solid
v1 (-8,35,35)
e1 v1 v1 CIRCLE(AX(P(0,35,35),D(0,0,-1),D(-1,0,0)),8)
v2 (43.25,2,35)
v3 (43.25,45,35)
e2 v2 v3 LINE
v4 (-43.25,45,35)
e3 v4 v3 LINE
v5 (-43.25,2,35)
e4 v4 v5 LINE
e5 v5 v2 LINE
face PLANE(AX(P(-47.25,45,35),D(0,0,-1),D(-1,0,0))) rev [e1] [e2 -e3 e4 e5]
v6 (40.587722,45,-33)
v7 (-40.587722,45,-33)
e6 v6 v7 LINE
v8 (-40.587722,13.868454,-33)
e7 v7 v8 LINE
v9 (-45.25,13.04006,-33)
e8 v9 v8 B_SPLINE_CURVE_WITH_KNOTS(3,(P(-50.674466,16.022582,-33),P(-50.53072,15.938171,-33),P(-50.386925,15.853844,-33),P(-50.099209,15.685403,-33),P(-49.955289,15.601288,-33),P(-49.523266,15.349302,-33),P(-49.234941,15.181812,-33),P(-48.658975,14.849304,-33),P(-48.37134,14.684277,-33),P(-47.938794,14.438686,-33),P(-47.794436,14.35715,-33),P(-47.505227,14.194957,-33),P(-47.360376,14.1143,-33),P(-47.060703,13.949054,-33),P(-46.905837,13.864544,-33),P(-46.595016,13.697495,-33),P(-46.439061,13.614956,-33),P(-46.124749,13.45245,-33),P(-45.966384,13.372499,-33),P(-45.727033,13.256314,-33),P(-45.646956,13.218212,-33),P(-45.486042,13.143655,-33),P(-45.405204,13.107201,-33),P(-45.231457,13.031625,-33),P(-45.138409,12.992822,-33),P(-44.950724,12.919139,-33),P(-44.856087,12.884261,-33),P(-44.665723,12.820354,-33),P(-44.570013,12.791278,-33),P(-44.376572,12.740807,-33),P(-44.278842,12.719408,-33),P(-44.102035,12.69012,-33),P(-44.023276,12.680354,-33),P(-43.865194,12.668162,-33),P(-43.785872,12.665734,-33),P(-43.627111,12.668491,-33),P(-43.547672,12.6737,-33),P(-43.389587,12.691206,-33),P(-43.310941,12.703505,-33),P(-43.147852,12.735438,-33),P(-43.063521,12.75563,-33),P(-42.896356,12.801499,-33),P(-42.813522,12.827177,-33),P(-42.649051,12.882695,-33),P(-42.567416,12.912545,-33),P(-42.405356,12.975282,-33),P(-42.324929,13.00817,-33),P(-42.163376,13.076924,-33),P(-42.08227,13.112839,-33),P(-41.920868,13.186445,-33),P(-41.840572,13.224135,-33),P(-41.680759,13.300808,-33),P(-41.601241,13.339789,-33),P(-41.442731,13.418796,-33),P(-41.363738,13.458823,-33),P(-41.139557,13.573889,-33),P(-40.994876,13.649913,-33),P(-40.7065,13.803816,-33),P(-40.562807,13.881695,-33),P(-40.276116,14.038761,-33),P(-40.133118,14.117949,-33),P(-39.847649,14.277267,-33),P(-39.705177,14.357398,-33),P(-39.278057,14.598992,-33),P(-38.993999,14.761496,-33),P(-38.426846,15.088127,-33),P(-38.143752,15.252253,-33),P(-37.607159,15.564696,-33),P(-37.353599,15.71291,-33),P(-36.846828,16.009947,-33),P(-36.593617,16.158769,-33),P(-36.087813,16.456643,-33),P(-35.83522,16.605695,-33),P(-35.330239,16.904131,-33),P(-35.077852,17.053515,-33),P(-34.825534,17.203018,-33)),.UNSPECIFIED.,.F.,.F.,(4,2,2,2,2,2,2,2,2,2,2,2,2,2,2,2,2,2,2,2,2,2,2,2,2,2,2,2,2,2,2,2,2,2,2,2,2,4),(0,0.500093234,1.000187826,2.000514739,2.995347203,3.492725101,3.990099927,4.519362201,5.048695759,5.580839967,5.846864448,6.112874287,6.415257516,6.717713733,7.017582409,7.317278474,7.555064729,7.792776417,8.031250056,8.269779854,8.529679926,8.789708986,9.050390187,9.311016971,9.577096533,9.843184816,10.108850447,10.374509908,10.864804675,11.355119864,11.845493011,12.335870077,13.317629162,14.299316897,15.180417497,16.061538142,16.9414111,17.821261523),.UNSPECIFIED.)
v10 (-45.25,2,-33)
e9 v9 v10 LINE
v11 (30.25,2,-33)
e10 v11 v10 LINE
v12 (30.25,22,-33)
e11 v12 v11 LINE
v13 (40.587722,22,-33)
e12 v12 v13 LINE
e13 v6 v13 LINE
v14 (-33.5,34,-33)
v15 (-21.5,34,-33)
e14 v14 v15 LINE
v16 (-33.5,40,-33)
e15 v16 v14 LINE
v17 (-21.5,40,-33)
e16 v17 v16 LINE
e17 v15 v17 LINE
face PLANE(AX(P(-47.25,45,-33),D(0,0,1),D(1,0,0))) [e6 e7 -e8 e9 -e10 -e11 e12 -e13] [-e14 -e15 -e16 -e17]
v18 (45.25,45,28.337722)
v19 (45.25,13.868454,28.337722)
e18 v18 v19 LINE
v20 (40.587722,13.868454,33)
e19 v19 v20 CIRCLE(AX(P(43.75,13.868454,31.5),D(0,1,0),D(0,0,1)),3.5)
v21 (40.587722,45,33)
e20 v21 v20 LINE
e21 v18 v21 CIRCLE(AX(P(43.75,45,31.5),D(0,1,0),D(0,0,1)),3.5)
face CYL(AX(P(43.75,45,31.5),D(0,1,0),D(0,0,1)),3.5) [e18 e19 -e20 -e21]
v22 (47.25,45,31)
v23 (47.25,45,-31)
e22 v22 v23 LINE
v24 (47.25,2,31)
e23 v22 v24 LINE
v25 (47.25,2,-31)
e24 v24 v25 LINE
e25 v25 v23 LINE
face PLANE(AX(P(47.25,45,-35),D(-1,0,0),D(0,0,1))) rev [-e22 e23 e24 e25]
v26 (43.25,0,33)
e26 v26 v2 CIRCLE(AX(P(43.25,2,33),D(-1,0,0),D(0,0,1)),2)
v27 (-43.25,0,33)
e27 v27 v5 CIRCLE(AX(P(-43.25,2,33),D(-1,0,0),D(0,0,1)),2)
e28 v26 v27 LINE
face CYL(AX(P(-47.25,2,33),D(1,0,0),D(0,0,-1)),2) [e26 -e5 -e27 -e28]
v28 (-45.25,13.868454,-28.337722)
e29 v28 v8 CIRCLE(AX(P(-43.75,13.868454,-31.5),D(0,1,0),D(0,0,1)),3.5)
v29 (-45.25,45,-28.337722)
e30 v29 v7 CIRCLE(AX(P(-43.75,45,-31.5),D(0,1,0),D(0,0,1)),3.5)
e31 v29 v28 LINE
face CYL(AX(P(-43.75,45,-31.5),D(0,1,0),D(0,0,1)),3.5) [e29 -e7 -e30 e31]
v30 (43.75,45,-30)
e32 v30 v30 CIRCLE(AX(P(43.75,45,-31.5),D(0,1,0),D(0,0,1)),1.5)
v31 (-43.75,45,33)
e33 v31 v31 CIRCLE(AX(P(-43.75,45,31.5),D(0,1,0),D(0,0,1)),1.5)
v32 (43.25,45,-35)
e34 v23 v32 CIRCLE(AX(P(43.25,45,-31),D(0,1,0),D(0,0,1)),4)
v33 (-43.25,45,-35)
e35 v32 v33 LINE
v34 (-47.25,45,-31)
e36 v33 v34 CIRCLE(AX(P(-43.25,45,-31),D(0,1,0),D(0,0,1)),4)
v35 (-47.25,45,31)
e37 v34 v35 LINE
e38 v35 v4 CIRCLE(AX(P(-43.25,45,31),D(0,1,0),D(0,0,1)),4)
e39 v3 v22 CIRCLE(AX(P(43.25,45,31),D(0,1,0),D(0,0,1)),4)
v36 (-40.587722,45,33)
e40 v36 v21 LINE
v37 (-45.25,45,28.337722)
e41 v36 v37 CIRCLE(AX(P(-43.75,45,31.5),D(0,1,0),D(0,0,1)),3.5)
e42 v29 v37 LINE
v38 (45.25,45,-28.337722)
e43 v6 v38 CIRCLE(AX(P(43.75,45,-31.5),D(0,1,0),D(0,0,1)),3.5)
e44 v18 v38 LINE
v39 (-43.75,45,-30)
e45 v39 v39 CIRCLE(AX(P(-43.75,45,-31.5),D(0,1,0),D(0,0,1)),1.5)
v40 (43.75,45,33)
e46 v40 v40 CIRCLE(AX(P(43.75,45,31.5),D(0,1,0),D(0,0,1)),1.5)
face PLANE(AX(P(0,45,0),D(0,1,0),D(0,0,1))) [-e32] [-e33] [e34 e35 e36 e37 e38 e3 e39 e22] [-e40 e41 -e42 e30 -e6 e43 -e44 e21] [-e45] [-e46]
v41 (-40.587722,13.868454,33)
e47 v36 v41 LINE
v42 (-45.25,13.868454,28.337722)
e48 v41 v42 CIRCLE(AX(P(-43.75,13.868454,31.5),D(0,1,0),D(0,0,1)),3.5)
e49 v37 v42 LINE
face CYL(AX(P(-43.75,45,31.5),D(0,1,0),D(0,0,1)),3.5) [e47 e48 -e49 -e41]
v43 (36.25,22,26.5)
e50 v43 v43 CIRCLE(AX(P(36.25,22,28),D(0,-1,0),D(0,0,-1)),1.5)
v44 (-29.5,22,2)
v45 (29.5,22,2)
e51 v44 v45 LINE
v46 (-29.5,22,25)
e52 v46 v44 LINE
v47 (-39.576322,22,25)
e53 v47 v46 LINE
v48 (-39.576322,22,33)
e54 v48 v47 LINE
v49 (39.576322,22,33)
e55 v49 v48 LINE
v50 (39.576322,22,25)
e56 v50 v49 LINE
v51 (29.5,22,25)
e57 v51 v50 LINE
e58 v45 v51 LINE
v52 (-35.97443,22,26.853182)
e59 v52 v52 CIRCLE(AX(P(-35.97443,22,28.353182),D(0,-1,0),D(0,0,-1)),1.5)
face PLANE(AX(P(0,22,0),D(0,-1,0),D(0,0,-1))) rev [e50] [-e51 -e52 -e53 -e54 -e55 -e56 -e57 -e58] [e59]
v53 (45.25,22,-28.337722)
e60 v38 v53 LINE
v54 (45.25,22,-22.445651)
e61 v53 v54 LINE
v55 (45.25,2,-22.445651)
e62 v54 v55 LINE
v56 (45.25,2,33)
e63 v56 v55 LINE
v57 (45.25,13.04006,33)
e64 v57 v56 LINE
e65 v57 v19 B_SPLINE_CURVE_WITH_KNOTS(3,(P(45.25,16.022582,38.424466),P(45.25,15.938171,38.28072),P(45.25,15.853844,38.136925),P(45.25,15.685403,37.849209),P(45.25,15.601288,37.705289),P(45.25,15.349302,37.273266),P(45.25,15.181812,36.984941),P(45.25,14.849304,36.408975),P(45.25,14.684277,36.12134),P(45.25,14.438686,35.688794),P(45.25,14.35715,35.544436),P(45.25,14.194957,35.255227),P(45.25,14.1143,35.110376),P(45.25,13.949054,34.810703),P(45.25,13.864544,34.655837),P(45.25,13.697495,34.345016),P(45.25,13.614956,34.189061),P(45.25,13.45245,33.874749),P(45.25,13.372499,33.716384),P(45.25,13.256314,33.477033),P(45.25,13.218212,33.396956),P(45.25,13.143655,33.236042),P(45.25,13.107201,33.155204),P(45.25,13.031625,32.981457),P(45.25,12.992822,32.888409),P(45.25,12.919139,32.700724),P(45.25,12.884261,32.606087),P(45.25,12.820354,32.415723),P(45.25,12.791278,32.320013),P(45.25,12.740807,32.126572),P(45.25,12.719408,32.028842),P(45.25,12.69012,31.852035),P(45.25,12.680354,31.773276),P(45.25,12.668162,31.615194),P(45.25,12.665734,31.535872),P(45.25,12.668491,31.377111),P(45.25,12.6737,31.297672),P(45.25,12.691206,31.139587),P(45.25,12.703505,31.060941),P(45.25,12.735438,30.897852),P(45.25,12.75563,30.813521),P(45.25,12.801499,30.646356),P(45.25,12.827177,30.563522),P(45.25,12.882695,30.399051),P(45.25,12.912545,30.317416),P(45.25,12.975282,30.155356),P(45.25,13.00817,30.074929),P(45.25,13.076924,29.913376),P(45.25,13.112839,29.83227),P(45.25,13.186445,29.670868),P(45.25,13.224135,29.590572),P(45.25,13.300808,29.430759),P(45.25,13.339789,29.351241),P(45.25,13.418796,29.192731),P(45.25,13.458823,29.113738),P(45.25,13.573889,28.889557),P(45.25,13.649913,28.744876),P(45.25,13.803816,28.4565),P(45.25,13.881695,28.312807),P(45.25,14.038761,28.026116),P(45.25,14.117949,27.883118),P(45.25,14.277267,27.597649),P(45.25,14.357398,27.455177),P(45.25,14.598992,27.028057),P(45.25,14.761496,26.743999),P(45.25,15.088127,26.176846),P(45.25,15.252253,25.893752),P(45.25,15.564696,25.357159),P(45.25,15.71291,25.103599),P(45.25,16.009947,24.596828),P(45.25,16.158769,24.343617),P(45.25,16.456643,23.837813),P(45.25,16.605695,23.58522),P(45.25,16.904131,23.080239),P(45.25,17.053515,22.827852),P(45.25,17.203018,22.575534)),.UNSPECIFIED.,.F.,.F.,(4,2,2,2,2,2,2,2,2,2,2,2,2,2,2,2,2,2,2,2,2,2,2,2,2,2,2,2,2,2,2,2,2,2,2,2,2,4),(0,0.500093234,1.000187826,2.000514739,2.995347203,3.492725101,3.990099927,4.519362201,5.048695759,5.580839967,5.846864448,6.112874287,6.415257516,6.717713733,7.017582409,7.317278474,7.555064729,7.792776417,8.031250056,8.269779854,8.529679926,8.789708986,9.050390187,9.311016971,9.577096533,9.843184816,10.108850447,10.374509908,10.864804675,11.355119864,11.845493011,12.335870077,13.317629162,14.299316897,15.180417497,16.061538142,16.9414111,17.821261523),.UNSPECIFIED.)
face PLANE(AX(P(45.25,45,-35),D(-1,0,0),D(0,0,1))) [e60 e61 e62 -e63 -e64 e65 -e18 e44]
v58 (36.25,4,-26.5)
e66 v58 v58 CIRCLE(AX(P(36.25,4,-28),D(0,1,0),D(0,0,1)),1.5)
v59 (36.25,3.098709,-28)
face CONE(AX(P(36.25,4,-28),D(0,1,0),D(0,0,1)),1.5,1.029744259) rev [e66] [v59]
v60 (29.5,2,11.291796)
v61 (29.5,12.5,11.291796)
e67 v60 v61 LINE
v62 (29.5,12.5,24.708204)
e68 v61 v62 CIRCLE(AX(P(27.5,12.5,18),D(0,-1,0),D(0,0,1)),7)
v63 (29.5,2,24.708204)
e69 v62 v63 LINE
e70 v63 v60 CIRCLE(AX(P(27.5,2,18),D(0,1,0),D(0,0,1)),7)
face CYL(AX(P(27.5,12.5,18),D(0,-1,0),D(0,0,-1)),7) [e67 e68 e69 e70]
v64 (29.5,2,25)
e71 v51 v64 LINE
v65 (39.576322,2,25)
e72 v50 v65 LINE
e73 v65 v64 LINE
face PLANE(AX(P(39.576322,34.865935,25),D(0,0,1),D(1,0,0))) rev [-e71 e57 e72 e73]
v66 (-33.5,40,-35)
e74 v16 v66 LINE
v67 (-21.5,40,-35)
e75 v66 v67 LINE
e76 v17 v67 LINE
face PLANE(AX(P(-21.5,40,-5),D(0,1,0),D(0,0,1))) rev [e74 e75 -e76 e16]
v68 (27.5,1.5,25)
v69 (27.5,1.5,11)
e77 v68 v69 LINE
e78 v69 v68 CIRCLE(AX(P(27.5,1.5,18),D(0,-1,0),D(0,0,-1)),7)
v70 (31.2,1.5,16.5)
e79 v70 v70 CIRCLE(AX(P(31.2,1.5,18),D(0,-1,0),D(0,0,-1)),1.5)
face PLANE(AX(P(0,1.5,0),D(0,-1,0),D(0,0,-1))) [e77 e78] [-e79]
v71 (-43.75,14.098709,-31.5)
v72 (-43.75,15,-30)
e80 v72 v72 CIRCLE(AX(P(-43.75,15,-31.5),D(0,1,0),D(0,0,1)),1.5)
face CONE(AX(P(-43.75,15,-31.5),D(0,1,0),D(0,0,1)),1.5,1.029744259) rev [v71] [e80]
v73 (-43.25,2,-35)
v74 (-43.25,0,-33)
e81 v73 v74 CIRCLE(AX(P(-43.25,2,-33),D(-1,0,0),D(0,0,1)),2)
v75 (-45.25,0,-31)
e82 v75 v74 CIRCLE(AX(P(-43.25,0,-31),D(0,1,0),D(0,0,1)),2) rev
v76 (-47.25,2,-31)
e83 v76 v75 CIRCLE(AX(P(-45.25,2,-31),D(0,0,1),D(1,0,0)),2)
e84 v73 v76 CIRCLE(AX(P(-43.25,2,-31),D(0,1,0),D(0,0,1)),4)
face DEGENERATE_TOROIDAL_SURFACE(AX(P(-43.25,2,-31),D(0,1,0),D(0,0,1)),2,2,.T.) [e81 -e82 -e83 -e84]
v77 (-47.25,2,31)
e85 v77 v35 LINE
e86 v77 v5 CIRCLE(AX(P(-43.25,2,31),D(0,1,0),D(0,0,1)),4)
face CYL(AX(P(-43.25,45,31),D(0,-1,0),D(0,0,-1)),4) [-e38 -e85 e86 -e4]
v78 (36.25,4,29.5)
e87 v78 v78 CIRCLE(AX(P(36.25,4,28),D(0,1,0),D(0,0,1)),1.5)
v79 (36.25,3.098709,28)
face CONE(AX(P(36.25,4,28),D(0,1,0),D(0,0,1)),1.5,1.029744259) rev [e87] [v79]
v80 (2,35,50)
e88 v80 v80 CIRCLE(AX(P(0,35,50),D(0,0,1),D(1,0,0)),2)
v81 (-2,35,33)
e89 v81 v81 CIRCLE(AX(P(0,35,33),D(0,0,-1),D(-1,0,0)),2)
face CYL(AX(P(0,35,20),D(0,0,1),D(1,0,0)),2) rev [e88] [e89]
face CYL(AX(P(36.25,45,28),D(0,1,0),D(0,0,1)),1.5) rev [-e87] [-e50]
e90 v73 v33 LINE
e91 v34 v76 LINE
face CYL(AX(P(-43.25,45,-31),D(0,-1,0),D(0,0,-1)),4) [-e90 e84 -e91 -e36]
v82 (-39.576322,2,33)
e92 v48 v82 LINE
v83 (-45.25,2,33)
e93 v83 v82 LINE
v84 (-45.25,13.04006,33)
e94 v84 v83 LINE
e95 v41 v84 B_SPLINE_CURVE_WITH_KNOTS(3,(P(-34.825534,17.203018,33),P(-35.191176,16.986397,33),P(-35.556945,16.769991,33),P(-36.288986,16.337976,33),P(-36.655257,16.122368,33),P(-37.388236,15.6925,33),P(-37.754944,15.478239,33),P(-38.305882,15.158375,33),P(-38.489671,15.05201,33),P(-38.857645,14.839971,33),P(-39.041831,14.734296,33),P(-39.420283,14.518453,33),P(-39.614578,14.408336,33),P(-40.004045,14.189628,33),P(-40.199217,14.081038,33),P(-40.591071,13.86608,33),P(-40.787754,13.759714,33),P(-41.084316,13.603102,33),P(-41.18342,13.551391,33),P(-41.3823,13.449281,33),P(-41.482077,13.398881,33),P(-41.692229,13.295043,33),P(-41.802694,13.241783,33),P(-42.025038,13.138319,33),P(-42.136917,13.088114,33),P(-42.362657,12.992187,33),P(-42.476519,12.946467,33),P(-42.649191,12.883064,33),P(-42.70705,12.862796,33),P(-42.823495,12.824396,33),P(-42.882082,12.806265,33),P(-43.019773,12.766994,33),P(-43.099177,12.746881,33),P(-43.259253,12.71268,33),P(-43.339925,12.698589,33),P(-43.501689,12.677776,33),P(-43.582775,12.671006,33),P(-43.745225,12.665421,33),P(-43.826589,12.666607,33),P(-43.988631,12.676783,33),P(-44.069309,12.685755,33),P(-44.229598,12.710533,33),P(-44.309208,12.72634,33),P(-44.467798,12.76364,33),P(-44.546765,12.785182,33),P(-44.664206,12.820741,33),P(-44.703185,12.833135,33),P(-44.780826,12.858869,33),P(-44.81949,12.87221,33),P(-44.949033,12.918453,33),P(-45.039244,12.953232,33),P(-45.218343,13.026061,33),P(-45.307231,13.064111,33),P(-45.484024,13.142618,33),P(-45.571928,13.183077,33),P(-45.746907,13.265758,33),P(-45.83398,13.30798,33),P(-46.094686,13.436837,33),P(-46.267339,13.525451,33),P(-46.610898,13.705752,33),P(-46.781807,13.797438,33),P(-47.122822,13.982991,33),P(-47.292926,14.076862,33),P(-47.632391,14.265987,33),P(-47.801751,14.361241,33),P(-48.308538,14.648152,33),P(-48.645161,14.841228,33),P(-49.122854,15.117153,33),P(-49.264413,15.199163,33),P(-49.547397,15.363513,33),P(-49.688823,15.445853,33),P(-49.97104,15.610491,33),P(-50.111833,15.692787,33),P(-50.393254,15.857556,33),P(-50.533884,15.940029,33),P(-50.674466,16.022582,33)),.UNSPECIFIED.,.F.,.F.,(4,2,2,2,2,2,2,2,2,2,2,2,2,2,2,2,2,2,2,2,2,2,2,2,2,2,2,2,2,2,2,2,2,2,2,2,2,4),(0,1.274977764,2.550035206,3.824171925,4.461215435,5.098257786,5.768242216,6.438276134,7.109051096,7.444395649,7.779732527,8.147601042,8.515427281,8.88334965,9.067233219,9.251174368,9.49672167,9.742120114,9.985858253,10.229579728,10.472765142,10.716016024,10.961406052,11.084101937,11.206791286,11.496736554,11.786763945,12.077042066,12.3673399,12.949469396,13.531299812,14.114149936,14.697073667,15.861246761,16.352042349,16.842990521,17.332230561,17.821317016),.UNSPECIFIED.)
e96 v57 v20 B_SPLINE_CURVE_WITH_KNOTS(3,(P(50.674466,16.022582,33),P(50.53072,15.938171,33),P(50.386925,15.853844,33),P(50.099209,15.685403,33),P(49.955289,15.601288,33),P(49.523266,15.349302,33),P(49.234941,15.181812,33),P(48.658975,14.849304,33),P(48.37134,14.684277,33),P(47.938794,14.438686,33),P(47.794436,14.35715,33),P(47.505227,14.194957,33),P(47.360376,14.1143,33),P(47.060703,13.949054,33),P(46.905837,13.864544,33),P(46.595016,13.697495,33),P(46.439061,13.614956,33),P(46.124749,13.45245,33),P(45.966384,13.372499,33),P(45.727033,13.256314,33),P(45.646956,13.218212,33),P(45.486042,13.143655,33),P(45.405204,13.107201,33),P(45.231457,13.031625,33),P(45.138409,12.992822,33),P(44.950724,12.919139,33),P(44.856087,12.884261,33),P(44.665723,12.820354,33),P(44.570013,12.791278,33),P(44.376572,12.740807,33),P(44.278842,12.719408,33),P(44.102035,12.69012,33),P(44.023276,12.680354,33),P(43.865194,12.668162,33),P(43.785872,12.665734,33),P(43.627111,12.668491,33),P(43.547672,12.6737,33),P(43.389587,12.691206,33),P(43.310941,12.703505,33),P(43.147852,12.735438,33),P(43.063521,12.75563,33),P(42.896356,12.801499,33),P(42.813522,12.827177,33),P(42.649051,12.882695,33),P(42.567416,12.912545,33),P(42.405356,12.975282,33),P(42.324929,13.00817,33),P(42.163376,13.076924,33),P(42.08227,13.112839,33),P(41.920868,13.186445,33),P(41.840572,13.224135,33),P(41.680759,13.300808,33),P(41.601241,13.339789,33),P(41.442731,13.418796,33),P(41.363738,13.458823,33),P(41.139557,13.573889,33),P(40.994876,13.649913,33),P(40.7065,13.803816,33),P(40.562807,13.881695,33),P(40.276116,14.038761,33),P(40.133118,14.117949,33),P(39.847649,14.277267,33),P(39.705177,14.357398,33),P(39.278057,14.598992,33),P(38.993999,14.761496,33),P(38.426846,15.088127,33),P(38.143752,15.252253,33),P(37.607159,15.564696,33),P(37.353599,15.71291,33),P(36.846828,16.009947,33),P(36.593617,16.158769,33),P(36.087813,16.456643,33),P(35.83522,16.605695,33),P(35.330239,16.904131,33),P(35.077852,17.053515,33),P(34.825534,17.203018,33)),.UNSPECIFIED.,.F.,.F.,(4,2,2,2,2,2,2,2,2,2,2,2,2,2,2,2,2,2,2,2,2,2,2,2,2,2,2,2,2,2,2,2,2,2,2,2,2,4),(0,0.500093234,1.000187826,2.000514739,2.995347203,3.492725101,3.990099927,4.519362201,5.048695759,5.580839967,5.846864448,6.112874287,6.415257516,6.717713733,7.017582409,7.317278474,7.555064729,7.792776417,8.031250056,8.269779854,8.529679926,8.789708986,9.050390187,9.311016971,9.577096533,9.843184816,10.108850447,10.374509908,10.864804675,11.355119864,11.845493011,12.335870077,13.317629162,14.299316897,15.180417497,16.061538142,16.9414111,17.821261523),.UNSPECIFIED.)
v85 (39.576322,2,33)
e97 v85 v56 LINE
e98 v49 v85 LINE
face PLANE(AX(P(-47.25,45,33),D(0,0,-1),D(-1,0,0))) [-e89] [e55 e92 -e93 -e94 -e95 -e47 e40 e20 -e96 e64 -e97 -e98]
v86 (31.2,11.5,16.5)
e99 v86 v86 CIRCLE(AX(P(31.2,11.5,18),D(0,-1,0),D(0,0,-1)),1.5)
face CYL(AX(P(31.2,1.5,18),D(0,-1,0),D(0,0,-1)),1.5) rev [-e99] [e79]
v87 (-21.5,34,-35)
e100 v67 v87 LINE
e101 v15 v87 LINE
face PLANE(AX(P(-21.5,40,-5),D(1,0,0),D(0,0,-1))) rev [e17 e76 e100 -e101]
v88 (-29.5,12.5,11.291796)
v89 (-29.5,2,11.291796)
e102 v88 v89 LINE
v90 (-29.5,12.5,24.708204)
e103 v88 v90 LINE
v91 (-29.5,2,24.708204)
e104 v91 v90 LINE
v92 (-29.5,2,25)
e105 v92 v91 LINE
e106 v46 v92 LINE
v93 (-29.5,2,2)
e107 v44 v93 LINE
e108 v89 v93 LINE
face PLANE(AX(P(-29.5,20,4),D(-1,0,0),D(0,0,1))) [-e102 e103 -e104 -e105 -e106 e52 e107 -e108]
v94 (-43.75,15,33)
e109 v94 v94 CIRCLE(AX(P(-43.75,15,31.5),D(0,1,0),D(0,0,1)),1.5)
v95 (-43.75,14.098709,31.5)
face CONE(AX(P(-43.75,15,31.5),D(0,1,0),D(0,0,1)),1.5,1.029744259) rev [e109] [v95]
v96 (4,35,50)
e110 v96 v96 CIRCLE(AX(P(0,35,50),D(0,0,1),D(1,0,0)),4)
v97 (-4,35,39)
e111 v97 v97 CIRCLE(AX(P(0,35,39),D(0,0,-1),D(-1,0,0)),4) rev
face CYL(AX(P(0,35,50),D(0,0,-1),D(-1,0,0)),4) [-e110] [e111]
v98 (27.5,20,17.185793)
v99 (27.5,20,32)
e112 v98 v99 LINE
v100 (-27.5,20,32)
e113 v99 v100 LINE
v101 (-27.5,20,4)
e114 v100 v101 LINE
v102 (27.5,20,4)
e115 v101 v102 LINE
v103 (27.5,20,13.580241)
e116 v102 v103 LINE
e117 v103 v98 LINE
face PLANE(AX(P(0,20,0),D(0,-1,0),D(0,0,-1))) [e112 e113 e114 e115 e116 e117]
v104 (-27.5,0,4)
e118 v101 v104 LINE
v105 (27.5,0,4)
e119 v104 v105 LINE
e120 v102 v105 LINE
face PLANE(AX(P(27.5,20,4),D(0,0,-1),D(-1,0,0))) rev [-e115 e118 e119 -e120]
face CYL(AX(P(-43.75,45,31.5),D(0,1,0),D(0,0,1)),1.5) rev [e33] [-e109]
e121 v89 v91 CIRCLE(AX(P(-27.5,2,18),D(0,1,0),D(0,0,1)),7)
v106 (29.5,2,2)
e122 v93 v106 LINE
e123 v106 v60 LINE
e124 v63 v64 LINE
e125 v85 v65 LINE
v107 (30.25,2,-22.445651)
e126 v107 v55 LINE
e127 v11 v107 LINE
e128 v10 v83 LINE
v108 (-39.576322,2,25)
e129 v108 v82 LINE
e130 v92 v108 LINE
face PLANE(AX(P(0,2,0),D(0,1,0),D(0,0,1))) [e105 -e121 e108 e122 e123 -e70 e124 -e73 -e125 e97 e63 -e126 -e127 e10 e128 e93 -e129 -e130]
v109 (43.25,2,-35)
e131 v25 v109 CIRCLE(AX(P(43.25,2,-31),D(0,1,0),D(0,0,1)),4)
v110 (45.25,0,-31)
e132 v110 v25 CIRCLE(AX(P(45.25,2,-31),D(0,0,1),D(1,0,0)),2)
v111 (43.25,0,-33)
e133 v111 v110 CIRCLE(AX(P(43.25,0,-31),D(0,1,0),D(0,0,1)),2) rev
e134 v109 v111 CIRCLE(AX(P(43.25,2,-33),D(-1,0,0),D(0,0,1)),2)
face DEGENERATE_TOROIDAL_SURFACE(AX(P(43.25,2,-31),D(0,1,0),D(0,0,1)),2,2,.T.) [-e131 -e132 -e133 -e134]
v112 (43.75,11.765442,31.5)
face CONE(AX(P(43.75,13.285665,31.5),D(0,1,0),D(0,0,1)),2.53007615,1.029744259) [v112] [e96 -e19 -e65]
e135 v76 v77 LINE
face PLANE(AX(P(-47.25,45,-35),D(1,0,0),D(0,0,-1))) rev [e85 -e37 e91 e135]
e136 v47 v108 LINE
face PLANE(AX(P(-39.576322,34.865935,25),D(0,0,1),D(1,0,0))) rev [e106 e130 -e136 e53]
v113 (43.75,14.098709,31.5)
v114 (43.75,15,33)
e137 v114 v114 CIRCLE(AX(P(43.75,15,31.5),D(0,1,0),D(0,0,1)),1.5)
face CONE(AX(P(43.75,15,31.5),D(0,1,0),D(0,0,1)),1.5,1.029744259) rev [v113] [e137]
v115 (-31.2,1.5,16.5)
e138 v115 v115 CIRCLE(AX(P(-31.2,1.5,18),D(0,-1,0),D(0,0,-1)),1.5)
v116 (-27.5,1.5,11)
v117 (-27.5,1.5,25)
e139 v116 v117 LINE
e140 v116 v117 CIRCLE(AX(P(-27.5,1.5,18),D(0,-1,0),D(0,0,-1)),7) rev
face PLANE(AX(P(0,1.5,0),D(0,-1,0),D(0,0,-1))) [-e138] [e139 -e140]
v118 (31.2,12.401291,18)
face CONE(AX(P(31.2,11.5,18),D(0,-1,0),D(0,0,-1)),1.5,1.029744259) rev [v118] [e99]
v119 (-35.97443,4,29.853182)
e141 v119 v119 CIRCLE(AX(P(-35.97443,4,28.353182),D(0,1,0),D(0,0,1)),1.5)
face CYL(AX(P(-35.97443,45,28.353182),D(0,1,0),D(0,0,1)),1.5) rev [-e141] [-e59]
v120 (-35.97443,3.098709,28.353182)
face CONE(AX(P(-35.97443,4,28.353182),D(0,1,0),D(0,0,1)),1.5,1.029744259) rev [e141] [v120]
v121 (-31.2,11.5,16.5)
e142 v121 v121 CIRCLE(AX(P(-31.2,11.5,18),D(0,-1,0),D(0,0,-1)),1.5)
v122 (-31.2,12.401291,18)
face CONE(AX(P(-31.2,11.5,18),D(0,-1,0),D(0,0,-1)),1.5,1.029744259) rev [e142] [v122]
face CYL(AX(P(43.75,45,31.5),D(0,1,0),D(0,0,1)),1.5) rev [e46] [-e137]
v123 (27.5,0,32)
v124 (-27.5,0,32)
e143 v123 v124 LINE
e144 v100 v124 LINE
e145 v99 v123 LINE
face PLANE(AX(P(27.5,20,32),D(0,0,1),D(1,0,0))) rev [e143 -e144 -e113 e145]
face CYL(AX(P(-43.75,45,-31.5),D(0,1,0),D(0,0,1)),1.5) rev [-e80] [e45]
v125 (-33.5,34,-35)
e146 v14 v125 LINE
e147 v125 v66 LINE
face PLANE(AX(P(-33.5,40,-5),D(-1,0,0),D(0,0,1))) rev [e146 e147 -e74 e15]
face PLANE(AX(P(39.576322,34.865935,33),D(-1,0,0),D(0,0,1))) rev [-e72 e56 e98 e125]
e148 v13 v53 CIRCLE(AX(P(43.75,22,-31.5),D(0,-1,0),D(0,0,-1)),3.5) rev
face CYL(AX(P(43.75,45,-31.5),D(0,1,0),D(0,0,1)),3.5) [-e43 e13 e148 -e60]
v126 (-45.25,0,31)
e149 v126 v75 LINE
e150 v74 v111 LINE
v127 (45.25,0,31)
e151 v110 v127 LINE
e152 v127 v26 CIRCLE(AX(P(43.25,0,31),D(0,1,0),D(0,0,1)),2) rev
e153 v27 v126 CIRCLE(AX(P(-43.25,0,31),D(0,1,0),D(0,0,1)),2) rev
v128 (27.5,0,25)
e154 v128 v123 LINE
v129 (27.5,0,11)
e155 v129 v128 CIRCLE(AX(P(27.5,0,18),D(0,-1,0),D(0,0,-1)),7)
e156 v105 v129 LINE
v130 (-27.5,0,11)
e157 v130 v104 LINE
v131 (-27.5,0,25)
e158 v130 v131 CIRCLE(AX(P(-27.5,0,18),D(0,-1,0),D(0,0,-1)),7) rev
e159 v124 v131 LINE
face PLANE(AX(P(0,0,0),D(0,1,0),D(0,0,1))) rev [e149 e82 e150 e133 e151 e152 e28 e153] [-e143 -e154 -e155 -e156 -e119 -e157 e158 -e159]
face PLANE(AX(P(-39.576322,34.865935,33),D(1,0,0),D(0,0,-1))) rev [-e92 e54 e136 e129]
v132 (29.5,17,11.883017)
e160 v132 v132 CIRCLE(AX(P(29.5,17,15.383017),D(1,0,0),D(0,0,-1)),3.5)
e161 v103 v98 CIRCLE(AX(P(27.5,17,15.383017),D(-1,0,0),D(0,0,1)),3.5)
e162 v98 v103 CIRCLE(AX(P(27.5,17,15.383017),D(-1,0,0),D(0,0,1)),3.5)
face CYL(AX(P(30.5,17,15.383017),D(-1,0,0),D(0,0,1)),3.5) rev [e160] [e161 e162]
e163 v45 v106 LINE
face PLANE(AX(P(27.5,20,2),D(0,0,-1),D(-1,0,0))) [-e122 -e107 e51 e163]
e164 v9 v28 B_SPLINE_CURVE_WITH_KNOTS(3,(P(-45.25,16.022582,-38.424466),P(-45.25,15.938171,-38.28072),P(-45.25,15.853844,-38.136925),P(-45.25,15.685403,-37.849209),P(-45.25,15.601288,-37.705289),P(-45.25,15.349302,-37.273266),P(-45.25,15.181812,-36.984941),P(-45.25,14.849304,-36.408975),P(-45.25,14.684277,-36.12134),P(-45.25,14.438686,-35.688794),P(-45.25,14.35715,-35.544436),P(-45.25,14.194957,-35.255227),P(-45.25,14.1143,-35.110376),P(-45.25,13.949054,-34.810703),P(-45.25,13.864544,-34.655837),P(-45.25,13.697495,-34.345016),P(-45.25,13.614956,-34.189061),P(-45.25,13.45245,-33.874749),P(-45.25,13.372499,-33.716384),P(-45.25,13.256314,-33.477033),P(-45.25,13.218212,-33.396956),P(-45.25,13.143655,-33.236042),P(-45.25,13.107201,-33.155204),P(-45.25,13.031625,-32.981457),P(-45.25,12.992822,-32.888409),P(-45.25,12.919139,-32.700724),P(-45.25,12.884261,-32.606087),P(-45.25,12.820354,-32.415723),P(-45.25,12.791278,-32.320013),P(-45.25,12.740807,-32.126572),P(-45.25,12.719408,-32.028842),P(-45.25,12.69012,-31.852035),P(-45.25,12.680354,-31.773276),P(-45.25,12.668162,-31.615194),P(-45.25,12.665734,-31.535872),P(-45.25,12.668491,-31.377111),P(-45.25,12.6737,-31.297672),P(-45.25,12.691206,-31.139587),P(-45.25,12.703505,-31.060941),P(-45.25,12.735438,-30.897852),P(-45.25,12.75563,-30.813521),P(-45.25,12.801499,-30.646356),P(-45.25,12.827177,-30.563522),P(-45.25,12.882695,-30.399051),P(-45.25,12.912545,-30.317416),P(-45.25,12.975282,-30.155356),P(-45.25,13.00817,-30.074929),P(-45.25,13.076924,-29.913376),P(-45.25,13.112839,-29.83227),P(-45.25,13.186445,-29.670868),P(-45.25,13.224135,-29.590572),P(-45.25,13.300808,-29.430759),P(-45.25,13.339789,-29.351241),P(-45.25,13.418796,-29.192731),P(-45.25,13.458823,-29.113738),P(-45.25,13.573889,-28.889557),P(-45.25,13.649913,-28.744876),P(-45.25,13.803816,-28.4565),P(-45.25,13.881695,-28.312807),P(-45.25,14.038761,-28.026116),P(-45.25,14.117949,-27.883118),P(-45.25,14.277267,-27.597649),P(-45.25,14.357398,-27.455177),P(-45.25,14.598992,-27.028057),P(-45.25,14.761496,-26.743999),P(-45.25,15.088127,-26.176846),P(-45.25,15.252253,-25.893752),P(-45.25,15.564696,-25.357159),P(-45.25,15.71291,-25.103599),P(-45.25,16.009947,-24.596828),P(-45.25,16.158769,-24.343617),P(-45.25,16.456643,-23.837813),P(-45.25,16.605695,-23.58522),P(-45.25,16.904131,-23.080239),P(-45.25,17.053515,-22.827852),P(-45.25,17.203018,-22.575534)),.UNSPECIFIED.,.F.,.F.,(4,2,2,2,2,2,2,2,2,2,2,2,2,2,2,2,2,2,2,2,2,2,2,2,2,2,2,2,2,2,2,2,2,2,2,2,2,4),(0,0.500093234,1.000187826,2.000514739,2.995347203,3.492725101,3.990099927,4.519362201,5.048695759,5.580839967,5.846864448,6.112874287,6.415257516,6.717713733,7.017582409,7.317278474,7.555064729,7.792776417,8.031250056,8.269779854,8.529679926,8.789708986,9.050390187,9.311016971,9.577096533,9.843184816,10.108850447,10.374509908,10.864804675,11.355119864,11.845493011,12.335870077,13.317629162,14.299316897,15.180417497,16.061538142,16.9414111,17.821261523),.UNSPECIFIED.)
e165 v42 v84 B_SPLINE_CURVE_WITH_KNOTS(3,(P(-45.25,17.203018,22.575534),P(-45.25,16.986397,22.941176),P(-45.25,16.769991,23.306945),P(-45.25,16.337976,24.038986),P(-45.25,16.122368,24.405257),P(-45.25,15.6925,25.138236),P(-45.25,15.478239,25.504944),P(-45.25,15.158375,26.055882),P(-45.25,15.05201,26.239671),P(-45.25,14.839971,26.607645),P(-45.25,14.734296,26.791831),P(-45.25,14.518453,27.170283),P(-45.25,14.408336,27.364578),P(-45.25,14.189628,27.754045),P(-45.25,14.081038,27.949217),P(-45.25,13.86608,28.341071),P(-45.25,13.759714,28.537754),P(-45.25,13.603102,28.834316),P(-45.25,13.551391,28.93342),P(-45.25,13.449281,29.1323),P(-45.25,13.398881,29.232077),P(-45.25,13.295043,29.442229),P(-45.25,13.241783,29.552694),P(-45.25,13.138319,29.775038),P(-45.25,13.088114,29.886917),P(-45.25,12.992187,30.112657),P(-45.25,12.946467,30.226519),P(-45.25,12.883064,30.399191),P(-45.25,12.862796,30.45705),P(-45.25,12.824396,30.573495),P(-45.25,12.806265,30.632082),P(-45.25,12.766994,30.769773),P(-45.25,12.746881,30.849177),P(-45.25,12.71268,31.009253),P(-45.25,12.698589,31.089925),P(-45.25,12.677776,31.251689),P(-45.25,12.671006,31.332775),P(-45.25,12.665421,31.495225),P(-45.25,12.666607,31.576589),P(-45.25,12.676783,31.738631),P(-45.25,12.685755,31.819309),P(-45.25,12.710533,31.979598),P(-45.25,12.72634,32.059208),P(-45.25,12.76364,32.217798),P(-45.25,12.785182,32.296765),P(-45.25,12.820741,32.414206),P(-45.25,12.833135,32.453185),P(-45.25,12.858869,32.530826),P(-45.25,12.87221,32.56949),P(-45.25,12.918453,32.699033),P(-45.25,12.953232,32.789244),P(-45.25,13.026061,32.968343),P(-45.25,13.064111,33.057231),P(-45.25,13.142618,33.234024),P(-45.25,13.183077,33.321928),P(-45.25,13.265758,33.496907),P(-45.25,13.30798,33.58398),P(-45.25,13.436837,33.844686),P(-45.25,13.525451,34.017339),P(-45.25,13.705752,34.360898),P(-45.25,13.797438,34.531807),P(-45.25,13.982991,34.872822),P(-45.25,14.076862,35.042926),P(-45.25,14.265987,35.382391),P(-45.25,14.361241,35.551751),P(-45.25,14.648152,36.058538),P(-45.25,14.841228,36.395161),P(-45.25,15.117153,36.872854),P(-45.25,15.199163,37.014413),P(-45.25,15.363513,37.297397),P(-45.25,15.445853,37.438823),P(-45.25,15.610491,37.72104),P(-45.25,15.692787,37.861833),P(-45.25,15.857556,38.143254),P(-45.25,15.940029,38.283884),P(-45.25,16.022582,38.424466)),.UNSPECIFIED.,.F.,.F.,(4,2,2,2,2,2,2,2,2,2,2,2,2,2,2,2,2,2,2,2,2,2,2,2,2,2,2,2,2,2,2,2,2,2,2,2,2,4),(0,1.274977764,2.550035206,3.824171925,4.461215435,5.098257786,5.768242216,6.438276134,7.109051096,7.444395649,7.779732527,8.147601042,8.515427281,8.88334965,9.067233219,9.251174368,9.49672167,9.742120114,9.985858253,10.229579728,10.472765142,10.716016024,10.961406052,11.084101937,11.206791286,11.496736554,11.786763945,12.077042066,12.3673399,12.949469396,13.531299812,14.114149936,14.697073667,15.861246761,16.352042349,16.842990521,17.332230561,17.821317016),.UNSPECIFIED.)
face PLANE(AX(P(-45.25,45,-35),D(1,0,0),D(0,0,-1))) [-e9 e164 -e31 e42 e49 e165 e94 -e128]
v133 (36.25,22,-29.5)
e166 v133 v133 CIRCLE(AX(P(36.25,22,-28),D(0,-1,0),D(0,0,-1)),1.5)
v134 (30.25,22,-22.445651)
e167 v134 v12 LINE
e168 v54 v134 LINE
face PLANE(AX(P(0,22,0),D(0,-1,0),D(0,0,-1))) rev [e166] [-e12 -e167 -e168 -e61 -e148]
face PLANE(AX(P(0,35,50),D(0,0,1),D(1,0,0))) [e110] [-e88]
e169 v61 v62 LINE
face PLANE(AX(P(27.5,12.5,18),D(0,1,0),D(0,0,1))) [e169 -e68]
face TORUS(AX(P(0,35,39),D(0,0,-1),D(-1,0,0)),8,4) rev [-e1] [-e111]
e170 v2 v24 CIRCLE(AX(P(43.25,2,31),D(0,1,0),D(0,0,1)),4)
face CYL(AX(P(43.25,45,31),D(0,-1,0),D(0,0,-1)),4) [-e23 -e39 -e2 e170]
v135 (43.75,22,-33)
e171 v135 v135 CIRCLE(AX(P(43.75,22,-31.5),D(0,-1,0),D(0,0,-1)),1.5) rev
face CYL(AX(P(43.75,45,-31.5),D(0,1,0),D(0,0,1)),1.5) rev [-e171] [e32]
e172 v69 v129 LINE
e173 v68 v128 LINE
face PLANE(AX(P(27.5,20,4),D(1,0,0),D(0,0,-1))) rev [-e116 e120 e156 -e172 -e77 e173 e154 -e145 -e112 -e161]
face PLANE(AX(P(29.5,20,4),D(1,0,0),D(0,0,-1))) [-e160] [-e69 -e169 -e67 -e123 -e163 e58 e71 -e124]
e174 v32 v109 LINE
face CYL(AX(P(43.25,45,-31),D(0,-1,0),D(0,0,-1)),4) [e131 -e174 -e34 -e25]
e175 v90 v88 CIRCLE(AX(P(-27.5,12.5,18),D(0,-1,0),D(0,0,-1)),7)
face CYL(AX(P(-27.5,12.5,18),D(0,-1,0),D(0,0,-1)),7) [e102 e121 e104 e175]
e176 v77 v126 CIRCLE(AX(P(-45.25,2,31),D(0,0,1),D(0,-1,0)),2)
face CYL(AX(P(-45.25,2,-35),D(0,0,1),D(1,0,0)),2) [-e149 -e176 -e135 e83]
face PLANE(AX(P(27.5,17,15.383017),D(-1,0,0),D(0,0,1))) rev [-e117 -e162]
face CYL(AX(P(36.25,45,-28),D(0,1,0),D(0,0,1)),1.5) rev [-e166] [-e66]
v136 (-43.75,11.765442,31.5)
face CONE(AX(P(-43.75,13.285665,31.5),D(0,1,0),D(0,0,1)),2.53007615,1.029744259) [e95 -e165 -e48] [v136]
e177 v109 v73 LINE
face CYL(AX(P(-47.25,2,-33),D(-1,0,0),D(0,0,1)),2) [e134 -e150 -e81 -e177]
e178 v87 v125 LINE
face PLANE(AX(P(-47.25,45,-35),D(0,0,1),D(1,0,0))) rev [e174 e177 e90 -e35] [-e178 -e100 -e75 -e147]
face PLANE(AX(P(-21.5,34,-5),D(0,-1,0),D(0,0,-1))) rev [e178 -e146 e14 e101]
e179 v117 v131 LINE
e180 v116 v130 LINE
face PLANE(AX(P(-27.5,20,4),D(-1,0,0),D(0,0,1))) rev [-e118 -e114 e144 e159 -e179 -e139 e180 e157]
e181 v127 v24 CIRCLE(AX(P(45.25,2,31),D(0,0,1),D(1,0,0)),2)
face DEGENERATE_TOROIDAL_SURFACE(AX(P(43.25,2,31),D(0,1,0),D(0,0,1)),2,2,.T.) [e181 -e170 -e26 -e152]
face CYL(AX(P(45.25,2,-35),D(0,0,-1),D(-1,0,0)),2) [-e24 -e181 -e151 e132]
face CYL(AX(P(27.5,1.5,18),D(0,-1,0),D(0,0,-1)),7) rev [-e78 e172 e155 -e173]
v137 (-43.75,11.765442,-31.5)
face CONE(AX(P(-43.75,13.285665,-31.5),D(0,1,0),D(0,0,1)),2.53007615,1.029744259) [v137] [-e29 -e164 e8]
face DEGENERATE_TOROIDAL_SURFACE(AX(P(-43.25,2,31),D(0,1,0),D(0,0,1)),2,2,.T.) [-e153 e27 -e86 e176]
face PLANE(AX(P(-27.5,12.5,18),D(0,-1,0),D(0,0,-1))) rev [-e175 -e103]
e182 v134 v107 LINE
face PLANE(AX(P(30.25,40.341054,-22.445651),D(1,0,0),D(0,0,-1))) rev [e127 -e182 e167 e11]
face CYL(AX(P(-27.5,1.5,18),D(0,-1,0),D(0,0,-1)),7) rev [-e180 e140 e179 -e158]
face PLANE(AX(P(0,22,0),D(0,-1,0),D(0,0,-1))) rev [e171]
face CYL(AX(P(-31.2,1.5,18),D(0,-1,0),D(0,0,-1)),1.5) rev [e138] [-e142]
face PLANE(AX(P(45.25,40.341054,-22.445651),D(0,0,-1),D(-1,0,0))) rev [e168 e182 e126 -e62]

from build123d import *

# Parameters (mm, degrees)
SKETCH1_W                 = 94.5
SKETCH1_H                 = 70
BOSS_EXTRUDE1_DEPTH       = 45
F_3_0MM_DOWEL_HOLE1_D     = 3
F_3_0MM_DOWEL_HOLE1_DEPTH = 30
F_3_0MM_DOWEL_HOLE1_TIP   = 0.901290929
SKETCH7_W                 = 55
SKETCH7_H                 = 28
CUT_EXTRUDE2_DEPTH        = 20
SHELL2_START              = 2
SHELL2_DEPTH              = 43
SHELL2_START_2            = 22
SHELL2_2_OUTLINE_W        = 59
SHELL2_2_OUTLINE_H        = 31
SHELL2_2_DEPTH            = 23
SHELL2_3_DEPTH            = 11.868454444
CUT_EXTRUDE3_DEPTH        = 1.5
BOSS_EXTRUDE9_DEPTH       = 11
F_3_0MM_DOWEL_HOLE3_D     = 3
F_3_0MM_DOWEL_HOLE3_DEPTH = 10
F_3_0MM_DOWEL_HOLE3_TIP   = 0.901290929
SKETCH15_R                = 3.5
CUT_EXTRUDE4_DEPTH        = 3
SKETCH30_W                = 10.076322372
SKETCH30_H                = 8
BOSS_EXTRUDE5_DEPTH       = 20
SKETCH31_W                = 15
SKETCH31_H                = 10.554348819
BOSS_EXTRUDE6_DEPTH       = 20
F_3_0MM_DOWEL_HOLE4_D     = 3
F_3_0MM_DOWEL_HOLE4_DEPTH = 41
F_3_0MM_DOWEL_HOLE4_TIP   = 0.901290929
SKETCH27_W                = 12
SKETCH27_H                = 6
CUT_EXTRUDE5_DEPTH        = 30
SKETCH33_R                = 4
BOSS_EXTRUDE7_DEPTH       = 15
SKETCH34_R                = 2
CUT_EXTRUDE6_DEPTH        = 30
FILLET1_R                 = 4
FILLET2_R                 = 4
FILLET3_R                 = 2


with BuildPart() as part:
    # Sketch1 → Boss-Extrude1 (new body)
    with BuildSketch(Plane(origin=(0, 0, 0), x_dir=(1, 0, 0), z_dir=(0, 1, 0))):
        Rectangle(SKETCH1_W, SKETCH1_H)
    extrude(amount=BOSS_EXTRUDE1_DEPTH)

    # Ø3.0mm Dowel Hole1
    with Locations(Plane(origin=(-43.75, 45, -31.5), x_dir=(0, 0, 1), z_dir=(0, 1, 0))):
        with Locations((0, 0), (0, 87.5), (63, 87.5), (63, 0)):
            Hole(F_3_0MM_DOWEL_HOLE1_D / 2, depth=F_3_0MM_DOWEL_HOLE1_DEPTH)
            with Locations((0, 0, -(F_3_0MM_DOWEL_HOLE1_DEPTH + F_3_0MM_DOWEL_HOLE1_TIP / 2))):  # 118° drill point
                Cone(0, F_3_0MM_DOWEL_HOLE1_D / 2, F_3_0MM_DOWEL_HOLE1_TIP, mode=Mode.SUBTRACT)

    # Sketch7 → Cut-Extrude2 (cut)
    with BuildSketch(Plane.XZ):
        with Locations((0, 18)):
            Rectangle(SKETCH7_W, SKETCH7_H)
    extrude(amount=-CUT_EXTRUDE2_DEPTH, mode=Mode.SUBTRACT)

    # Shell2: read off the stored shape, not the designer's step
    # Shell2 outline → Shell2 (cut)
    with BuildSketch(Plane(origin=(0, 0, 0), x_dir=(1, 0, 0), z_dir=(0, 1, 0)).offset(SHELL2_START)):
        with BuildLine():
            Line((-45.25, 28.33772234), (-45.25, -28.33772234))
            ThreePointArc((-45.25, -28.33772234), (-41.275126266, -29.025126266), (-40.58772234, -33))
            Line((-40.58772234, -33), (-29.5, -33))
            Line((-29.5, -33), (-29.5, -2))
            Line((-29.5, -2), (29.5, -2))
            Line((29.5, -2), (29.5, -33))
            Line((29.5, -33), (40.58772234, -33))
            ThreePointArc((40.58772234, -33), (41.275126266, -29.025126266), (45.25, -28.33772234))
            Line((45.25, -28.33772234), (45.25, 28.33772234))
            ThreePointArc((45.25, 28.33772234), (41.275126266, 29.025126266), (40.58772234, 33))
            Line((40.58772234, 33), (-40.58772234, 33))
            ThreePointArc((-40.58772234, 33), (-41.275126266, 29.025126266), (-45.25, 28.33772234))
        make_face()
    extrude(amount=SHELL2_DEPTH, mode=Mode.SUBTRACT)

    # Shell2 2 outline → Shell2 2 (cut)
    with BuildSketch(Plane(origin=(0, 0, 0), x_dir=(1, 0, 0), z_dir=(0, 1, 0)).offset(SHELL2_START_2)):
        with Locations((0, -17.5)):
            Rectangle(SHELL2_2_OUTLINE_W, SHELL2_2_OUTLINE_H)
    extrude(amount=SHELL2_2_DEPTH, mode=Mode.SUBTRACT)

    # Shell2 3 outline → Shell2 3 (cut)
    with BuildSketch(Plane(origin=(0, 0, 0), x_dir=(1, 0, 0), z_dir=(0, 1, 0)).offset(SHELL2_START)):
        with BuildLine():
            Line((-45.25, -28.33772234), (-45.25, -33))
            Line((-45.25, -33), (-40.58772234, -33))
            ThreePointArc((-40.58772234, -33), (-41.275126266, -29.025126266), (-45.25, -28.33772234))
        make_face()
        with BuildLine():
            Line((-45.25, 33), (-45.25, 28.33772234))
            ThreePointArc((-45.25, 28.33772234), (-41.275126266, 29.025126266), (-40.58772234, 33))
            Line((-40.58772234, 33), (-45.25, 33))
        make_face()
        with BuildLine():
            Line((45.25, 33), (40.58772234, 33))
            ThreePointArc((40.58772234, 33), (41.275126266, 29.025126266), (45.25, 28.33772234))
            Line((45.25, 28.33772234), (45.25, 33))
        make_face()
        with BuildLine():
            ThreePointArc((45.25, -28.33772234), (41.275126266, -29.025126266), (40.58772234, -33))
            Line((40.58772234, -33), (45.25, -33))
            Line((45.25, -33), (45.25, -28.33772234))
        make_face()
    extrude(amount=SHELL2_3_DEPTH, mode=Mode.SUBTRACT)

    # Shell2 4 outline → Shell2 4 (revolve)
    with BuildSketch(Plane(origin=(-43.75, 0, 31.5), x_dir=(1, 0, 0), z_dir=(0, 0, 1))):
        Polygon((0, 13.868454444), (0, 11.765442277), (3.5, 13.868454444), align=None)
    revolve(axis=Axis((-43.75, 0, 31.5), (0, 1, 0)))

    # Shell2 5 outline → Shell2 5 (revolve)
    with BuildSketch(Plane(origin=(43.75, 0, 31.5), x_dir=(1, 0, 0), z_dir=(0, 0, 1))):
        Polygon((0, 13.868454444), (0, 11.765442277), (3.5, 13.868454444), align=None)
    revolve(axis=Axis((43.75, 0, 31.5), (0, 1, 0)))

    # Shell2 6 outline → Shell2 6 (revolve)
    with BuildSketch(Plane(origin=(43.75, 0, -31.5), x_dir=(1, 0, 0), z_dir=(0, 0, 1))):
        Polygon((0, 13.868454444), (0, 11.765442277), (3.5, 13.868454444), align=None)
    revolve(axis=Axis((43.75, 0, -31.5), (0, 1, 0)))

    # Shell2 7 outline → Shell2 7 (revolve)
    with BuildSketch(Plane(origin=(-43.75, 0, -31.5), x_dir=(1, 0, 0), z_dir=(0, 0, 1))):
        Polygon((0, 13.868454444), (0, 11.765442277), (3.5, 13.868454444), align=None)
    revolve(axis=Axis((-43.75, 0, -31.5), (0, 1, 0)))

    # Sketch8 → Cut-Extrude3 (cut)
    with BuildSketch(Plane.XZ):
        with BuildLine():
            Line((27.5, 25), (27.5, 11))
            ThreePointArc((27.5, 11), (34.5, 18), (27.5, 25))
        make_face()
        with BuildLine():
            ThreePointArc((-27.5, 25), (-34.5, 18), (-27.5, 11))
            Line((-27.5, 11), (-27.5, 25))
        make_face()
    extrude(amount=-CUT_EXTRUDE3_DEPTH, mode=Mode.SUBTRACT)

    # Sketch36 → Boss-Extrude9 (add)
    with BuildSketch(Plane.XZ.offset(-1.5)):
        with BuildLine():
            Line((-27.5, 25), (-27.5, 11))
            ThreePointArc((-27.5, 11), (-34.5, 18), (-27.5, 25))
        make_face()
        with BuildLine():
            Line((27.5, 25), (27.5, 11))
            ThreePointArc((27.5, 11), (34.5, 18), (27.5, 25))
        make_face()
    extrude(amount=-BOSS_EXTRUDE9_DEPTH)

    # Ø3.0mm Dowel Hole3
    with Locations(Plane(origin=(31.2, 1.5, 18), x_dir=(0, 0, -1), z_dir=(0, -1, 0))):
        with Locations((0, 0), (0, -62.4)):
            Hole(F_3_0MM_DOWEL_HOLE3_D / 2, depth=F_3_0MM_DOWEL_HOLE3_DEPTH)
            with Locations((0, 0, -(F_3_0MM_DOWEL_HOLE3_DEPTH + F_3_0MM_DOWEL_HOLE3_TIP / 2))):  # 118° drill point
                Cone(0, F_3_0MM_DOWEL_HOLE3_D / 2, F_3_0MM_DOWEL_HOLE3_TIP, mode=Mode.SUBTRACT)

    # Sketch15 → Cut-Extrude4 (cut)
    with BuildSketch(Plane.ZY.offset(-27.5)):
        with Locations(Location((15.383017002, 17, 0), (0, 0, 58.997280866))):
            Circle(SKETCH15_R)
    extrude(amount=-CUT_EXTRUDE4_DEPTH, mode=Mode.SUBTRACT)

    # Sketch30 → Boss-Extrude5 (add)
    with BuildSketch(Plane(origin=(0, 2, 0), x_dir=(1, 0, 0), z_dir=(0, 1, 0))):
        with Locations((34.538161186, -29)):
            Rectangle(SKETCH30_W, SKETCH30_H)
        with Locations((-34.538161186, -29)):
            Rectangle(SKETCH30_W, SKETCH30_H)
    extrude(amount=BOSS_EXTRUDE5_DEPTH)

    # Sketch31 → Boss-Extrude6 (add)
    with BuildSketch(Plane(origin=(0, 2, 0), x_dir=(1, 0, 0), z_dir=(0, 1, 0))):
        with Locations((37.75, 27.722825591)):
            Rectangle(SKETCH31_W, SKETCH31_H)
    extrude(amount=BOSS_EXTRUDE6_DEPTH)

    # Ø3.0mm Dowel Hole4
    with Locations(Plane(origin=(36.25, 45, 28), x_dir=(0, 0, 1), z_dir=(0, 1, 0))):
        with Locations((0, 0), (0.35318171, -72.224429626), (-56, 0)):
            Hole(F_3_0MM_DOWEL_HOLE4_D / 2, depth=F_3_0MM_DOWEL_HOLE4_DEPTH)
            with Locations((0, 0, -(F_3_0MM_DOWEL_HOLE4_DEPTH + F_3_0MM_DOWEL_HOLE4_TIP / 2))):  # 118° drill point
                Cone(0, F_3_0MM_DOWEL_HOLE4_D / 2, F_3_0MM_DOWEL_HOLE4_TIP, mode=Mode.SUBTRACT)

    # Sketch27 → Cut-Extrude5 (cut)
    with BuildSketch(Plane(origin=(0, 0, -35), x_dir=(-1, 0, 0), z_dir=(0, 0, -1))):
        with Locations((27.5, 37)):
            Rectangle(SKETCH27_W, SKETCH27_H)
    extrude(amount=-CUT_EXTRUDE5_DEPTH, mode=Mode.SUBTRACT)

    # Sketch33 → Boss-Extrude7 (add)
    with BuildSketch(Plane.XY.offset(35)):
        with Locations(Location((0, 35, 0), (0, 0, 180))):
            Circle(SKETCH33_R)
    extrude(amount=BOSS_EXTRUDE7_DEPTH)

    # Sketch34 → Cut-Extrude6 (cut)
    with BuildSketch(Plane.XY.offset(50)):
        with Locations((0, 35)):
            Circle(SKETCH34_R)
    extrude(amount=-CUT_EXTRUDE6_DEPTH, mode=Mode.SUBTRACT)

    # Fillet1
    fillet1_edges = [part.edges().sort_by_distance(p)[0] for p in [
        (4, 35, 35),
    ]]
    fillet(fillet1_edges, radius=FILLET1_R)

    # Fillet2
    fillet2_edges = [part.edges().sort_by_distance(p)[0] for p in [
        (47.25, 22.5, 35),
        (-47.25, 22.5, 35),
        (-47.25, 22.5, -35),
        (47.25, 22.5, -35),
    ]]
    fillet(fillet2_edges, radius=FILLET2_R)

    # Fillet3
    fillet3_edges = [part.edges().sort_by_distance(p)[0] for p in [
        (0, 0, 35),
        (47.25, 0, 0),
        (-47.25, 0, 0),
        (0, 0, -35),
        (46.078427125, 0, -33.828427125),
        (46.078427125, 0, 33.828427125),
        (-46.078427125, 0, -33.828427125),
        (-46.078427125, 0, 33.828427125),
    ]]
    fillet(fillet3_edges, radius=FILLET3_R)


solid = part.part
